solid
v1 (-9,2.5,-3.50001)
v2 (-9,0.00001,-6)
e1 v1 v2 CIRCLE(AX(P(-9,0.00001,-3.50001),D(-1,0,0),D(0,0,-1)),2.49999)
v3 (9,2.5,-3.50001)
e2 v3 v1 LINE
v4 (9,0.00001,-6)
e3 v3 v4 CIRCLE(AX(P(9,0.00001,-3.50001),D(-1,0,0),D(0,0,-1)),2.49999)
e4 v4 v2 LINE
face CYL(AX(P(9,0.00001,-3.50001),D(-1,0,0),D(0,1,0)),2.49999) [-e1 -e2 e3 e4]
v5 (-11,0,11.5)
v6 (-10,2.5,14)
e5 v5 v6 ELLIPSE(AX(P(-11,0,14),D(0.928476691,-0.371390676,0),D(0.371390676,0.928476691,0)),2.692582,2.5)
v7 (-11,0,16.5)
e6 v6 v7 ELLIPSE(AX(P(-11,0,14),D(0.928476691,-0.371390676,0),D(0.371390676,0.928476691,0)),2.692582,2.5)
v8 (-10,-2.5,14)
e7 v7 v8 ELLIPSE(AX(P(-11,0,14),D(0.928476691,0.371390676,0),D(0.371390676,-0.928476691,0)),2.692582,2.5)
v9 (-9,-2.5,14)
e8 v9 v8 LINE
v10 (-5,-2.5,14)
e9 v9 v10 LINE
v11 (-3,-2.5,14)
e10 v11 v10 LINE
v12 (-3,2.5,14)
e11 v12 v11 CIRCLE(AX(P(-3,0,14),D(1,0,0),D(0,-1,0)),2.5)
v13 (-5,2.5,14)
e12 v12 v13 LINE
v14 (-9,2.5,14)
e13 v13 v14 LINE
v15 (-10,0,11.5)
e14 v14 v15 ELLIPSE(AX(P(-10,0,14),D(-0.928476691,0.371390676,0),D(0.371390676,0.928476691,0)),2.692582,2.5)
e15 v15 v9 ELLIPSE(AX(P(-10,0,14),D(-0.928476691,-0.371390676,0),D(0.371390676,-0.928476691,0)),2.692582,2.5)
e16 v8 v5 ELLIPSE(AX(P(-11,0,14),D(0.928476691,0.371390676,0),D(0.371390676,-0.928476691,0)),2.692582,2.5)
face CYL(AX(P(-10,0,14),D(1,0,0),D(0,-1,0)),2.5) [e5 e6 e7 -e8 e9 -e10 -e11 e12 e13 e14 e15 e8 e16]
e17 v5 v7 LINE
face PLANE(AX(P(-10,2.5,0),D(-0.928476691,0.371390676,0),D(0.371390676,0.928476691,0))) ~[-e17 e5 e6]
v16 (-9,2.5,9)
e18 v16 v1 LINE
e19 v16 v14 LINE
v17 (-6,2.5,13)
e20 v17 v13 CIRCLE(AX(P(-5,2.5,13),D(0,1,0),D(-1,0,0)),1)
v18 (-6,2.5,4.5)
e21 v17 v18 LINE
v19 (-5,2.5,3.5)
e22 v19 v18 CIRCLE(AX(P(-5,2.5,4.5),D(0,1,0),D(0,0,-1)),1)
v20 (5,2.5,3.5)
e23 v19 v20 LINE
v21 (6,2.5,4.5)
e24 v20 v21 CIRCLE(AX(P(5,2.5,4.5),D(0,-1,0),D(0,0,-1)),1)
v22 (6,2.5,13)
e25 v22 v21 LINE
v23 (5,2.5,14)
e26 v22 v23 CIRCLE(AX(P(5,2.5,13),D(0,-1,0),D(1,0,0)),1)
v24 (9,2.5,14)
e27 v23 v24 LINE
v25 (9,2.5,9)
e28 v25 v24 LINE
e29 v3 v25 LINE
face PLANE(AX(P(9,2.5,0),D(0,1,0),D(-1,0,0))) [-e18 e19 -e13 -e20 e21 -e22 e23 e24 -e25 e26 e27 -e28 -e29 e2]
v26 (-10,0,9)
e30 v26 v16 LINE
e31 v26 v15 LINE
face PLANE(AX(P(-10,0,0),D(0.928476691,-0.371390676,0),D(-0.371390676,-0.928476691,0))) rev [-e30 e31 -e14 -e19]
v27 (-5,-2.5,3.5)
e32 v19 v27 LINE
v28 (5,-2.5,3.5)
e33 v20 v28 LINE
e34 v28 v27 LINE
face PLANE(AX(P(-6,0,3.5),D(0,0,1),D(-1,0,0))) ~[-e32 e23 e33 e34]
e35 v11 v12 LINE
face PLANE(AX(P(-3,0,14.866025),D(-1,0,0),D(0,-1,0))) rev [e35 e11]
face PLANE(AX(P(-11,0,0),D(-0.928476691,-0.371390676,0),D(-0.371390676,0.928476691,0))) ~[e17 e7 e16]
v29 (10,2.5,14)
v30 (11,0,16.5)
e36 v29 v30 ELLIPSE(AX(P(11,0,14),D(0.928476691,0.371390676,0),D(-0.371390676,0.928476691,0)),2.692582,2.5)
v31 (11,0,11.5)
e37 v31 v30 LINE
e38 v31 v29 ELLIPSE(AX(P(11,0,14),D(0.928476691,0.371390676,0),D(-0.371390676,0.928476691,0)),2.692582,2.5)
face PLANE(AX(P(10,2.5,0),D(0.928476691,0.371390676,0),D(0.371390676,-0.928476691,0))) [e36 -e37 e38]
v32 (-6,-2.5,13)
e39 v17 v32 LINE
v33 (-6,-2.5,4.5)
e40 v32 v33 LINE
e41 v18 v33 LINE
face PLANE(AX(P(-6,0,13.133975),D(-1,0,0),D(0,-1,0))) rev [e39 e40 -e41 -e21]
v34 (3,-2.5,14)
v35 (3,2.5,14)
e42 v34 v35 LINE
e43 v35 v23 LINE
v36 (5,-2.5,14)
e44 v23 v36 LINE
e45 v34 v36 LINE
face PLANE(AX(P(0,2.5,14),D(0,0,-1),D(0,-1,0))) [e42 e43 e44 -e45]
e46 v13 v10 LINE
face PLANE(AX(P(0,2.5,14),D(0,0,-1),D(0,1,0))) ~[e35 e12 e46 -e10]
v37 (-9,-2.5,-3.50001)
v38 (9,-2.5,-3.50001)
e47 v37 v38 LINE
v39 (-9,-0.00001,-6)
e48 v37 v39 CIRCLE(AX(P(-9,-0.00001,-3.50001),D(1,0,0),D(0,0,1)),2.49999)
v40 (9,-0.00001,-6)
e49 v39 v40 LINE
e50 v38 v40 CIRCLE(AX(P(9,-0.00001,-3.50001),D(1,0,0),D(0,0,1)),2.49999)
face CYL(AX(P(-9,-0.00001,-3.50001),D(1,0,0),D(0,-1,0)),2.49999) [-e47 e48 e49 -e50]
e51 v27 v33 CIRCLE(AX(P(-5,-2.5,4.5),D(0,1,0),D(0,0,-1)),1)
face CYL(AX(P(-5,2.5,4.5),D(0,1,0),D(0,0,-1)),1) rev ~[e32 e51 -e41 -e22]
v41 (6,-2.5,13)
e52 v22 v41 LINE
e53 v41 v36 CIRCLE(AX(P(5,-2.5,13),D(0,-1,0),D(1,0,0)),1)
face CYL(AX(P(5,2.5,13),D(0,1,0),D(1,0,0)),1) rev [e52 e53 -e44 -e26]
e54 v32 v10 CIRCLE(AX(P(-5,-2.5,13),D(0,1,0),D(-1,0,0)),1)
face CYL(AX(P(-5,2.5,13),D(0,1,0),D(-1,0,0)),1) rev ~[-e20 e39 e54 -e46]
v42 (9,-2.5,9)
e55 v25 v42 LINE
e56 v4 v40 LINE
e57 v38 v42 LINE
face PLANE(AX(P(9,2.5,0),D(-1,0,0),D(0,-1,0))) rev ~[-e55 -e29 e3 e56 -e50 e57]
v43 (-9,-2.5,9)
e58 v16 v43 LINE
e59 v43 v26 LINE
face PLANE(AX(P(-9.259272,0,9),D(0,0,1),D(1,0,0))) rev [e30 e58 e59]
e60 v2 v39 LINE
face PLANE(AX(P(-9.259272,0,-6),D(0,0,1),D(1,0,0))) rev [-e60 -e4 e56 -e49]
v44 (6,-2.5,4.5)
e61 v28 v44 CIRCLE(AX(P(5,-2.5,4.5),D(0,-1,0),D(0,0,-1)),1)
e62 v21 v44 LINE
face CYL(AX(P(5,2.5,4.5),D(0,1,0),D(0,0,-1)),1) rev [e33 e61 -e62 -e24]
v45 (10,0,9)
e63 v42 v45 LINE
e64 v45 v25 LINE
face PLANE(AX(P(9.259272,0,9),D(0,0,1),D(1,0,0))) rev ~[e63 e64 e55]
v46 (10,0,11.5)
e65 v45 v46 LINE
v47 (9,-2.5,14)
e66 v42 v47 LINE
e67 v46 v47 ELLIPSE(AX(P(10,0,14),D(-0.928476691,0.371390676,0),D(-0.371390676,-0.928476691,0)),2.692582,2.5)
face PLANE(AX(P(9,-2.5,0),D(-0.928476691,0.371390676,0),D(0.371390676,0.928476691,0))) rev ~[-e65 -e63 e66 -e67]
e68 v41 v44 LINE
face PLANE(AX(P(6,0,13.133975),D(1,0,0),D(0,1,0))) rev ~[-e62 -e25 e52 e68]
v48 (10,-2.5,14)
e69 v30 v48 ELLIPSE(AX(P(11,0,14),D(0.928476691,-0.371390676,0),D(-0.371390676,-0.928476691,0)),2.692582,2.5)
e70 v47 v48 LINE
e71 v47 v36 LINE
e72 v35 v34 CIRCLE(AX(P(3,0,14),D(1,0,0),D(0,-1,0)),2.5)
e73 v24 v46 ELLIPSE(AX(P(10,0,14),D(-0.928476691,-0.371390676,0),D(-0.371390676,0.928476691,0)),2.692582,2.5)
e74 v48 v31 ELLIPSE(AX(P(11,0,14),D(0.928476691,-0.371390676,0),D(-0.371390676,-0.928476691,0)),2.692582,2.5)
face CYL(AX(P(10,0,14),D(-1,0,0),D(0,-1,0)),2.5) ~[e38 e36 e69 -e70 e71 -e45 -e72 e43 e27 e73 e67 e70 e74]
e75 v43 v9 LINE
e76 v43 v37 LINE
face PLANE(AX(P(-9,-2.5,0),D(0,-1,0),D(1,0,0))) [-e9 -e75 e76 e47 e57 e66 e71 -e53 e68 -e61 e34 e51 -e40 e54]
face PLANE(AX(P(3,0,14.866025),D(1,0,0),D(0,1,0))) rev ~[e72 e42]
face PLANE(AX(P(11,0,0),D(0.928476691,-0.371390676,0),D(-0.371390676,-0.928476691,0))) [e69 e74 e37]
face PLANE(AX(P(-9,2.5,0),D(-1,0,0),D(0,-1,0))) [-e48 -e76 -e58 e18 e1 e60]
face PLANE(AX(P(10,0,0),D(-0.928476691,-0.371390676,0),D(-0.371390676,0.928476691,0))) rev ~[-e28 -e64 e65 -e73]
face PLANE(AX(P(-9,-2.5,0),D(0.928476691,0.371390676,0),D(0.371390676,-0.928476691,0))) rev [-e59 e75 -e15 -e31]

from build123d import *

# Parameters (mm, degrees)
F2_DEPTH    = 2.5
F3_DEPTH    = 10
F4_DEPTH    = 3
F5_DEPTH    = 6
F6_T1_DEPTH = 5
F8_DEPTH    = 14
F9_DEPTH    = 9
F10_DEPTH   = 1
F11_DEPTH   = 16.5
F13_DEPTH   = 6
F14_R       = 2.49999


# Not quite as in the source:
# - a fillet or chamfer that OpenCascade refuses, or shapes differently, is made with other operations: its cross-section is extruded or revolved along the edge and cut away or added
# - a fillet or chamfer is up to 0.001 mm smaller than in the source, because OpenCascade refuses the exact size


with BuildPart() as f2:
    # F0 (on Front) → F2 (new body, symmetric)
    with BuildSketch(Plane.XZ):
        Polygon((0, 3.5), (0, 0), (9, 0), (9, 14), (6, 14), (6, 3.5), align=None)
    extrude(amount=F2_DEPTH, both=True)

    # F1 (on Right) → F3 (join)
    with BuildSketch(Plane.YZ):
        with BuildLine():
            Line((-2.5, 14), (2.5, 14))
            ThreePointArc((2.5, 14), (0, 16.5), (-2.5, 14))
        make_face()
        with BuildLine():
            ThreePointArc((-2.5, 14), (0, 11.5), (2.5, 14))
            Line((2.5, 14), (-2.5, 14))
        make_face()
    extrude(amount=F3_DEPTH)

    # F1 (on Right) → F4 (cut)
    with BuildSketch(Plane.YZ):
        with BuildLine():
            Line((-2.5, 14), (2.5, 14))
            ThreePointArc((2.5, 14), (0, 16.5), (-2.5, 14))
        make_face()
        with BuildLine():
            ThreePointArc((-2.5, 14), (0, 11.5), (2.5, 14))
            Line((2.5, 14), (-2.5, 14))
        make_face()
    extrude(amount=F4_DEPTH, mode=Mode.SUBTRACT)

    # F1 (on Right) → F5 (cut)
    with BuildSketch(Plane.YZ):
        with BuildLine():
            ThreePointArc((-2.5, 14), (0, 11.5), (2.5, 14))
            Line((2.5, 14), (-2.5, 14))
        make_face()
    extrude(amount=F5_DEPTH, mode=Mode.SUBTRACT)

    # F6: fillet of radius 1 on 2 edges, made by hand

    # F6_s2 → F6_t1 (join)
    with BuildSketch(Plane.XZ.offset(-2.5)):
        with BuildLine():
            ThreePointArc((6, 13), (5.7071067812, 13.7071067812), (5, 14))
            Line((5, 14), (6, 14))
            Line((6, 14), (6, 13))
        make_face()
        with BuildLine():
            ThreePointArc((5, 3.5), (5.7071067812, 3.7928932188), (6, 4.5))
            Line((6, 4.5), (6, 3.5))
            Line((6, 3.5), (5, 3.5))
        make_face()
    extrude(amount=F6_T1_DEPTH)

    # F7 (on Top) → F8 (join)
    with BuildSketch(Plane.XY):
        Polygon((9, 2.5), (9, -2.5), (10, 0), align=None)
    extrude(amount=F8_DEPTH)

    # F7 (on Top) → F9 (cut)
    with BuildSketch(Plane.XY):
        Polygon((9, 2.5), (9, -2.5), (10, 0), align=None)
    extrude(amount=F9_DEPTH, mode=Mode.SUBTRACT)

    # F10 (add): a face of the model
    f10_faces = [f2.faces().sort_by_distance(p)[0] for p in [
        (10, -1.717766953, 12.282233047),
    ]]
    extrude(f10_faces, amount=F10_DEPTH)

    # F7 (on Top) → F11 (cut)
    with BuildSketch(Plane.XY):
        Polygon((11, 0), (10, -2.5), (11.5, -2.5), (11.5, 2.5), (10, 2.5), align=None)
    extrude(amount=F11_DEPTH, mode=Mode.SUBTRACT)

    # F12: F2 across face


with BuildPart() as f2_1:
    add(f2.part)
    add(f2.part.mirror(Plane(origin=(0, 0, 1.75), x_dir=(0, -1, 0), z_dir=(-1, 0, 0))))

    # F13 (add): a face of the model
    f13_faces = [f2_1.faces().sort_by_distance(p)[0] for p in [
        (0, 0, 0),
    ]]
    extrude(f13_faces, amount=F13_DEPTH)

    # F14 (radius 2.5 in the source; OpenCascade refuses exactly that, so slightly less here)
    f14_edges = [f2_1.edges().sort_by_distance(p)[0] for p in [
        (0, -2.5, -6),
        (0, 2.5, -6),
    ]]
    fillet(f14_edges, radius=F14_R)


solid = f2_1.part
